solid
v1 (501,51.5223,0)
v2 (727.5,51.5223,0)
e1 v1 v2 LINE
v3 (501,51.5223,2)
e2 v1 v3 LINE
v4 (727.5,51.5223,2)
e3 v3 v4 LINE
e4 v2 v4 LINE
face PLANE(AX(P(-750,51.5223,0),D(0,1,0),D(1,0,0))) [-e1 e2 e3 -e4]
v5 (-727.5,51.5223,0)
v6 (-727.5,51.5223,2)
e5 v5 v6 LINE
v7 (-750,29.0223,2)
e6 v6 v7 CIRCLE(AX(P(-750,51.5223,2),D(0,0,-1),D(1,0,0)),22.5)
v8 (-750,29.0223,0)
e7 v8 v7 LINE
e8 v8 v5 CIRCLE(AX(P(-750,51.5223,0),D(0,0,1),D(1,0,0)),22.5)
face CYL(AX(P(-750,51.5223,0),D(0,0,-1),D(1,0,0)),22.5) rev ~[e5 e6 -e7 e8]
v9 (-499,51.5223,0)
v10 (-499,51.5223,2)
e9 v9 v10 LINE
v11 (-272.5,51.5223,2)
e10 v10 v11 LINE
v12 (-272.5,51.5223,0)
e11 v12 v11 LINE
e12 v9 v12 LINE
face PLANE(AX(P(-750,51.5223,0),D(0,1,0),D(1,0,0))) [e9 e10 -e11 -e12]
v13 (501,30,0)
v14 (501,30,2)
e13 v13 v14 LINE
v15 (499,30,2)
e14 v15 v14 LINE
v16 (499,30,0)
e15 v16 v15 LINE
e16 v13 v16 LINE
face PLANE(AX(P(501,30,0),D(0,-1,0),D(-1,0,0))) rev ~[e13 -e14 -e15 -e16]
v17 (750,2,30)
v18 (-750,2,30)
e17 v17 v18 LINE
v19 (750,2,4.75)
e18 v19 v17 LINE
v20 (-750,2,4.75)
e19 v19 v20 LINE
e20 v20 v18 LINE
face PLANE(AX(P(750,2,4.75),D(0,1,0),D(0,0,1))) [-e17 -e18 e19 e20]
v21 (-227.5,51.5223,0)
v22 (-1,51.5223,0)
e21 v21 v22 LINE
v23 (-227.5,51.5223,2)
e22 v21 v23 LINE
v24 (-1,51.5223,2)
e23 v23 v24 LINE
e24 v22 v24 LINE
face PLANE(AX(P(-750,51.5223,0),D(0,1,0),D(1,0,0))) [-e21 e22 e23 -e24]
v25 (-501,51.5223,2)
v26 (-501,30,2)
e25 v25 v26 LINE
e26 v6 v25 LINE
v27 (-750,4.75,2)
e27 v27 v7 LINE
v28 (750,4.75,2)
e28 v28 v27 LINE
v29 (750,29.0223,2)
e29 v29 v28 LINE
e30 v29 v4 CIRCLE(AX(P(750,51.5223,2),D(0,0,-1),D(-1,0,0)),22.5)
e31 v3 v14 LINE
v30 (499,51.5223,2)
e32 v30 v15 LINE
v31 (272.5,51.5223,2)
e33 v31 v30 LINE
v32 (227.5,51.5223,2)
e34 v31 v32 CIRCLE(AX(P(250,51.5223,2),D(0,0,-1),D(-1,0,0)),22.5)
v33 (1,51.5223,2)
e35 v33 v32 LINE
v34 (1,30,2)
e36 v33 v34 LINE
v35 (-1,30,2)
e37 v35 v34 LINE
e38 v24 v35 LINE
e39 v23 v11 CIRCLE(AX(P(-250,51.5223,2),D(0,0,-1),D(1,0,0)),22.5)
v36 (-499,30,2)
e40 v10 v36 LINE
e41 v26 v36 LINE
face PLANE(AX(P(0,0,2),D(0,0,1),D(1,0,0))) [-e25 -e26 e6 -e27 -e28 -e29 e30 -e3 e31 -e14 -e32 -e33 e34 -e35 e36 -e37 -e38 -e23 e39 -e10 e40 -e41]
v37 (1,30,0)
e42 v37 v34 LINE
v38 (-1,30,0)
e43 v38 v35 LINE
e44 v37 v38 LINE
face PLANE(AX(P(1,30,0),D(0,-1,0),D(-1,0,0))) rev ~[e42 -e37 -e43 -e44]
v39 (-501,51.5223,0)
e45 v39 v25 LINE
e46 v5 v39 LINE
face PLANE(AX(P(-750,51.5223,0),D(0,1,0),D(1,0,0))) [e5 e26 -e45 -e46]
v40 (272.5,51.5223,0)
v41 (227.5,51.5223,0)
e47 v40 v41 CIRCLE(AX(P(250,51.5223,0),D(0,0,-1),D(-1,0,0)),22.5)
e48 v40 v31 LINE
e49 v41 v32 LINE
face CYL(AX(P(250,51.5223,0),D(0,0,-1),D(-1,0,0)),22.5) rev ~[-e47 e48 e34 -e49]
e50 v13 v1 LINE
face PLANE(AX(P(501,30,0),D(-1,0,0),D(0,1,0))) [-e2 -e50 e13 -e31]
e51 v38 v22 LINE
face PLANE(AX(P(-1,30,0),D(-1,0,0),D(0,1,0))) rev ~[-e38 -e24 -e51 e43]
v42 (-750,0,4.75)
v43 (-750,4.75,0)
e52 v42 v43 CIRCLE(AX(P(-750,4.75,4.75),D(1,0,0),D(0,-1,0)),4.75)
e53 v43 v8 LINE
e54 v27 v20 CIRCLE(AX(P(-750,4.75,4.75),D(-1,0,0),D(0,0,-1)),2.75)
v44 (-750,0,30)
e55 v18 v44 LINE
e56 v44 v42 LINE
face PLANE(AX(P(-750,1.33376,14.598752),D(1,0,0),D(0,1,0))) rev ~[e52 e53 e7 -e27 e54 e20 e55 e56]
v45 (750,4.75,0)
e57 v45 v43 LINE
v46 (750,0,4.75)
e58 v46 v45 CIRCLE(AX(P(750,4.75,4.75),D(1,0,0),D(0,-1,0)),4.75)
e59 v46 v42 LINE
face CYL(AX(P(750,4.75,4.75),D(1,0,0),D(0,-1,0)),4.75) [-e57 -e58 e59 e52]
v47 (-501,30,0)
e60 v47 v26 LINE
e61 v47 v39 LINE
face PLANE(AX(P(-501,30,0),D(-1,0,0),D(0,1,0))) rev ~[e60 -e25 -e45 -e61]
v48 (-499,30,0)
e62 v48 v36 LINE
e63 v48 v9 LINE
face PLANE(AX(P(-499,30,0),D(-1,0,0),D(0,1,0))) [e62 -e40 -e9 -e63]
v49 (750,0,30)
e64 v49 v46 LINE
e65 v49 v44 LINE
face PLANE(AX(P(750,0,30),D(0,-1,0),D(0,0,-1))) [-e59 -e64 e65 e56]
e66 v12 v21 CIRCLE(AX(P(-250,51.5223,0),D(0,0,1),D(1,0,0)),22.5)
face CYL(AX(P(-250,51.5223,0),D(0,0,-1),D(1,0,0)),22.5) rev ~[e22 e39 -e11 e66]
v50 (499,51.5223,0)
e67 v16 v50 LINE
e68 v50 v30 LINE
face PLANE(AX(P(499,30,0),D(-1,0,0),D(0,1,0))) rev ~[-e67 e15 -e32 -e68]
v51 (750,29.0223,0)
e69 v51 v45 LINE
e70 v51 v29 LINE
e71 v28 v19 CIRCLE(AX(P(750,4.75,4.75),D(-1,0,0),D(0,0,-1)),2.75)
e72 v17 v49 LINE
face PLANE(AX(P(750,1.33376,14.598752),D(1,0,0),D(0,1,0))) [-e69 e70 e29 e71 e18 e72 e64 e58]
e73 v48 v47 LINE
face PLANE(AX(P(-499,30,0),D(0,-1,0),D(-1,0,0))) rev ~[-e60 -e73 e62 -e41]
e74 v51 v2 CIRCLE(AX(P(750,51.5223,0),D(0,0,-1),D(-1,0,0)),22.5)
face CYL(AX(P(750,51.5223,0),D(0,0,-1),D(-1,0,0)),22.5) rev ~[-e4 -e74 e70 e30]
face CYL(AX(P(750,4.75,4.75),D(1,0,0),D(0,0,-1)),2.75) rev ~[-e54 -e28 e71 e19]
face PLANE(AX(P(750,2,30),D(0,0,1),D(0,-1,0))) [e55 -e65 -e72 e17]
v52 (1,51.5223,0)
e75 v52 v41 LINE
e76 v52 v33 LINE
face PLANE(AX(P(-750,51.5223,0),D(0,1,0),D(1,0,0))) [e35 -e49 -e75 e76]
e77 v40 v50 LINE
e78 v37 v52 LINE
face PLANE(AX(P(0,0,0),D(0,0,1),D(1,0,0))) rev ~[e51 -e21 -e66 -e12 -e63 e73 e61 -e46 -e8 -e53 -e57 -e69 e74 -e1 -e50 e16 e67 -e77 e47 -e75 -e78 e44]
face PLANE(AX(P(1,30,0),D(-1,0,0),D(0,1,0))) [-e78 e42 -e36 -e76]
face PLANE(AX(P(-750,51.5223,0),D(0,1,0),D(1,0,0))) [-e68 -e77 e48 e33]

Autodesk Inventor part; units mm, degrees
ref_plane "YZ Plane" through (0, 0, 0) normal (1, 0, 0) x (0, 1, 0)
ref_plane "XZ Plane" through (0, 0, 0) normal (0, 1, 0) x (-1, 0, 0)
ref_plane "XY Plane" through (0, 0, 0) normal (0, 0, 1) x (1, 0, 0)
sketch "Sketch1" plane through (0, 0, 0) normal (0, 0, 1) x (1, 0, 0)
  line L0 (-750, 51.5223) -> (750, 51.5223)
  line L1 (750, 51.5223) -> (750, 0)
  line L2 (750, 0) -> (-750, 0)
  line L3 (-750, 0) -> (-750, 51.5223)
  point P0 (0, 0)
  point P1 (0, 0)
  dimension "d0" = 1500
  dimension "d1" = 51.5224
extrude "Plate1" add sketch "Sketch1" along normal blind 2
sketch "Sketch2" plane through (750, 2, 0) normal (0, -1, 0) x (1, 0, 0)
  line L0 (-1500, 0) -> (0, 0)
  line L1 (0, 0) -> (0, 30)
  line L2 (0, 30) -> (-1500, 30)
  line L3 (-1500, 30) -> (-1500, 0)
edge flange "Flange1" height 30 angle 90 thickness 2 bend radius 2.75 thickness toward (0, -1, 0) relief round relief width 2 relief depth 1 edges at (0, 0, 2) wall of the first edge with corners at (-750, 2, 0) (750, 2, 0) (750, 2, 30) (-750, 2, 30)
bend "Bend1"
corner "Corner1"
sketch "Sketch5" plane through (0, 0, 0) normal (0, 0, -1) x (-1, 0, 0)
  line L0 (750, 51.5223) -> (-750, 51.5223) projected
  line L1 (-1, 30) -> (-1, 51.5223)
  line L2 (750, 0) -> (-750, 0) projected
  line L3 (-1, 30) -> (1, 30)
  line L4 (1, 30) -> (1, 51.5223)
  point P0 (0, 0)
  point P1 (0, 30)
  point P2 (0, 0)
  dimension "d27" = 2
  dimension "d28" = 30
extrude "Extrusion1" cut sketch "Sketch5" against normal through all
pattern_linear "Rectangular Pattern1" count 3 spacing 500 along (1, 0, 0) of "Extrusion1" first direction both ways yes
sketch "Sketch6" plane through (0, 0, 0) normal (0, 0, -1) x (-1, 0, 0)
  line L0 (-750, 51.5223) -> (-750, 4.75) projected
  circle A0 centre (-750, 51.5223) radius 22.5
  line L1 (-750, 51.5223) -> (750, 51.5223) projected
  line L2 (-1, 30) -> (-1, 51.5223) construction
  line L3 (-499, 51.5223) -> (-499, 30) construction
  line L4 (-499, 30) -> (-1, 30) construction
  circle A1 centre (-250, 51.5223) radius 22.5
  point P0 (0, 0)
  point P1 (-727.5, 51.5223)
  point P2 (-750, 29.0223)
  point P3 (-250, 30)
  point P4 (-227.5, 51.5223)
  point P5 (-272.5, 51.5223)
  dimension "d24" = 45
extrude "Extrusion2" cut sketch "Sketch6" against normal through all contours L1 A0 L0 | L1 A1 picked at (-748.3311, 36.7103) picked at (-248.2369, 40.5916)
mirror "Mirror1" about plane through (0, 0, 0) normal (1, 0, 0) of "Extrusion2"
sketch "Sketch7" plane through (0, 0, 2) normal (0, 0, 1) x (1, 0, 0)
  arc A0 (-750, 29.0223) -> (-727.5, 51.5223) centre (-750, 51.5223) ccw projected
  line L0 (-750, 4.75) -> (-750, 29.0223) projected
  line L1 (-750, 4.75) -> (750, 4.75) projected
  line L2 (750, 29.0223) -> (750, 4.75) projected
  arc A1 (727.5, 51.5223) -> (750, 29.0223) centre (750, 51.5223) ccw projected
  line L3 (501, 51.5223) -> (727.5, 51.5223) projected
  line L4 (501, 51.5223) -> (501, 30) projected
  line L5 (501, 30) -> (499, 30) projected
  line L6 (499, 30) -> (499, 51.5223) projected
  line L7 (1, 51.5223) -> (227.5, 51.5223) projected
  line L8 (1, 51.5223) -> (1, 30) projected
  line L9 (1, 30) -> (-1, 30) projected
  line L10 (-1, 30) -> (-1, 51.5223) projected
  line L11 (-499, 51.5223) -> (-272.5, 51.5223) projected
  line L12 (-499, 51.5223) -> (-499, 30) projected
  line L13 (-499, 30) -> (-501, 30) projected
  line L14 (-501, 30) -> (-501, 51.5223) projected
  line L15 (-727.5, 51.5223) -> (-501, 51.5223) projected
  line L16 (650, 4.75) -> (650, 51.5223) construction
  line L17 (-750, 4.75) -> (750, 4.75) projected
  line L18 (646, 24.6721) -> (650, 31.6003)
  line L19 (650, 31.6003) -> (654, 24.6721)
  line L20 (654, 24.6721) -> (646, 24.6721)
  line L21 (650, 31.6003) -> (650, 24.6721) construction
  line L22 (272.5, 51.5223) -> (499, 51.5223) projected
  arc A2 (227.5, 51.5223) -> (272.5, 51.5223) centre (250, 51.5223) ccw projected
  line L23 (-227.5, 51.5223) -> (-1, 51.5223) projected
  arc A3 (-272.5, 51.5223) -> (-227.5, 51.5223) centre (-250, 51.5223) ccw projected
  point P0 (0, 0)
  point P1 (650, 28.1362)
  dimension "d29" = 100
  dimension "d30" = 8
extrude "Extrusion3" [suppressed]
mirror "Mirror2" [suppressed]
sketch "Sketch8" plane through (0, 0, 2) normal (0, 0, 1) x (1, 0, 0)
  line L0 (494, 46.5223) -> (494, 34.5223) construction
  line L1 (494, 34.5223) -> (294, 34.5223) construction
  line L2 (294, 34.5223) -> (294, 46.5223) construction
  line L3 (294, 46.5223) -> (494, 46.5223) construction
  line L4 (501, 51.5223) -> (727.5, 51.5223) projected
  line L5 (272.5, 51.5223) -> (499, 51.5223) projected
  point P0 (0, 0)
  dimension "d35" = 200
  dimension "d36" = 12
  dimension "d39" = 5
  dimension "d40" = 5
mark "Mark1"
equation "\"d28\" = Стрингер_глубина_паза"
equation "\"d1\" = Стрингер_5"
equation "\"d27\" = d18"
equation "\"d2\" = Thickness"
equation "\"d3\" = BendReliefWidth"
equation "\"d4\" = BendReliefDepth"
equation "\"d5\" = MinimumRemnant"
equation "\"d6\" = TransitionRadius"
equation "\"d9\" = BendRadius"
equation "\"d10\" = CornerReliefSize"
equation "\"d11\" = GapSize"
equation "\"d12\" = JacobiRadiusSize"
equation "\"BendReliefWidth\" = Thickness"
equation "\"BendReliefDepth\" = 0.5 * Thickness"
equation "\"CornerReliefSize\" = 4 * Thickness"
equation "\"MinimumRemnant\" = 2 * Thickness"
equation "\"TransitionRadius\" = BendRadius"
equation "\"JacobiRadiusSize\" = BendRadius"
equation "\"GapSize\" = Thickness"
equation "\"d18\" = Thickness"
equation "\"Стрингер_5\" = 51.522347"
equation "\"Thickness\" = 2"
equation "\"BendRadius\" = 2.75"
equation "\"Стрингер_глубина_паза\" = 30"
properties part number "MSC 055 stringer board ###" material "Stainless Steel"
